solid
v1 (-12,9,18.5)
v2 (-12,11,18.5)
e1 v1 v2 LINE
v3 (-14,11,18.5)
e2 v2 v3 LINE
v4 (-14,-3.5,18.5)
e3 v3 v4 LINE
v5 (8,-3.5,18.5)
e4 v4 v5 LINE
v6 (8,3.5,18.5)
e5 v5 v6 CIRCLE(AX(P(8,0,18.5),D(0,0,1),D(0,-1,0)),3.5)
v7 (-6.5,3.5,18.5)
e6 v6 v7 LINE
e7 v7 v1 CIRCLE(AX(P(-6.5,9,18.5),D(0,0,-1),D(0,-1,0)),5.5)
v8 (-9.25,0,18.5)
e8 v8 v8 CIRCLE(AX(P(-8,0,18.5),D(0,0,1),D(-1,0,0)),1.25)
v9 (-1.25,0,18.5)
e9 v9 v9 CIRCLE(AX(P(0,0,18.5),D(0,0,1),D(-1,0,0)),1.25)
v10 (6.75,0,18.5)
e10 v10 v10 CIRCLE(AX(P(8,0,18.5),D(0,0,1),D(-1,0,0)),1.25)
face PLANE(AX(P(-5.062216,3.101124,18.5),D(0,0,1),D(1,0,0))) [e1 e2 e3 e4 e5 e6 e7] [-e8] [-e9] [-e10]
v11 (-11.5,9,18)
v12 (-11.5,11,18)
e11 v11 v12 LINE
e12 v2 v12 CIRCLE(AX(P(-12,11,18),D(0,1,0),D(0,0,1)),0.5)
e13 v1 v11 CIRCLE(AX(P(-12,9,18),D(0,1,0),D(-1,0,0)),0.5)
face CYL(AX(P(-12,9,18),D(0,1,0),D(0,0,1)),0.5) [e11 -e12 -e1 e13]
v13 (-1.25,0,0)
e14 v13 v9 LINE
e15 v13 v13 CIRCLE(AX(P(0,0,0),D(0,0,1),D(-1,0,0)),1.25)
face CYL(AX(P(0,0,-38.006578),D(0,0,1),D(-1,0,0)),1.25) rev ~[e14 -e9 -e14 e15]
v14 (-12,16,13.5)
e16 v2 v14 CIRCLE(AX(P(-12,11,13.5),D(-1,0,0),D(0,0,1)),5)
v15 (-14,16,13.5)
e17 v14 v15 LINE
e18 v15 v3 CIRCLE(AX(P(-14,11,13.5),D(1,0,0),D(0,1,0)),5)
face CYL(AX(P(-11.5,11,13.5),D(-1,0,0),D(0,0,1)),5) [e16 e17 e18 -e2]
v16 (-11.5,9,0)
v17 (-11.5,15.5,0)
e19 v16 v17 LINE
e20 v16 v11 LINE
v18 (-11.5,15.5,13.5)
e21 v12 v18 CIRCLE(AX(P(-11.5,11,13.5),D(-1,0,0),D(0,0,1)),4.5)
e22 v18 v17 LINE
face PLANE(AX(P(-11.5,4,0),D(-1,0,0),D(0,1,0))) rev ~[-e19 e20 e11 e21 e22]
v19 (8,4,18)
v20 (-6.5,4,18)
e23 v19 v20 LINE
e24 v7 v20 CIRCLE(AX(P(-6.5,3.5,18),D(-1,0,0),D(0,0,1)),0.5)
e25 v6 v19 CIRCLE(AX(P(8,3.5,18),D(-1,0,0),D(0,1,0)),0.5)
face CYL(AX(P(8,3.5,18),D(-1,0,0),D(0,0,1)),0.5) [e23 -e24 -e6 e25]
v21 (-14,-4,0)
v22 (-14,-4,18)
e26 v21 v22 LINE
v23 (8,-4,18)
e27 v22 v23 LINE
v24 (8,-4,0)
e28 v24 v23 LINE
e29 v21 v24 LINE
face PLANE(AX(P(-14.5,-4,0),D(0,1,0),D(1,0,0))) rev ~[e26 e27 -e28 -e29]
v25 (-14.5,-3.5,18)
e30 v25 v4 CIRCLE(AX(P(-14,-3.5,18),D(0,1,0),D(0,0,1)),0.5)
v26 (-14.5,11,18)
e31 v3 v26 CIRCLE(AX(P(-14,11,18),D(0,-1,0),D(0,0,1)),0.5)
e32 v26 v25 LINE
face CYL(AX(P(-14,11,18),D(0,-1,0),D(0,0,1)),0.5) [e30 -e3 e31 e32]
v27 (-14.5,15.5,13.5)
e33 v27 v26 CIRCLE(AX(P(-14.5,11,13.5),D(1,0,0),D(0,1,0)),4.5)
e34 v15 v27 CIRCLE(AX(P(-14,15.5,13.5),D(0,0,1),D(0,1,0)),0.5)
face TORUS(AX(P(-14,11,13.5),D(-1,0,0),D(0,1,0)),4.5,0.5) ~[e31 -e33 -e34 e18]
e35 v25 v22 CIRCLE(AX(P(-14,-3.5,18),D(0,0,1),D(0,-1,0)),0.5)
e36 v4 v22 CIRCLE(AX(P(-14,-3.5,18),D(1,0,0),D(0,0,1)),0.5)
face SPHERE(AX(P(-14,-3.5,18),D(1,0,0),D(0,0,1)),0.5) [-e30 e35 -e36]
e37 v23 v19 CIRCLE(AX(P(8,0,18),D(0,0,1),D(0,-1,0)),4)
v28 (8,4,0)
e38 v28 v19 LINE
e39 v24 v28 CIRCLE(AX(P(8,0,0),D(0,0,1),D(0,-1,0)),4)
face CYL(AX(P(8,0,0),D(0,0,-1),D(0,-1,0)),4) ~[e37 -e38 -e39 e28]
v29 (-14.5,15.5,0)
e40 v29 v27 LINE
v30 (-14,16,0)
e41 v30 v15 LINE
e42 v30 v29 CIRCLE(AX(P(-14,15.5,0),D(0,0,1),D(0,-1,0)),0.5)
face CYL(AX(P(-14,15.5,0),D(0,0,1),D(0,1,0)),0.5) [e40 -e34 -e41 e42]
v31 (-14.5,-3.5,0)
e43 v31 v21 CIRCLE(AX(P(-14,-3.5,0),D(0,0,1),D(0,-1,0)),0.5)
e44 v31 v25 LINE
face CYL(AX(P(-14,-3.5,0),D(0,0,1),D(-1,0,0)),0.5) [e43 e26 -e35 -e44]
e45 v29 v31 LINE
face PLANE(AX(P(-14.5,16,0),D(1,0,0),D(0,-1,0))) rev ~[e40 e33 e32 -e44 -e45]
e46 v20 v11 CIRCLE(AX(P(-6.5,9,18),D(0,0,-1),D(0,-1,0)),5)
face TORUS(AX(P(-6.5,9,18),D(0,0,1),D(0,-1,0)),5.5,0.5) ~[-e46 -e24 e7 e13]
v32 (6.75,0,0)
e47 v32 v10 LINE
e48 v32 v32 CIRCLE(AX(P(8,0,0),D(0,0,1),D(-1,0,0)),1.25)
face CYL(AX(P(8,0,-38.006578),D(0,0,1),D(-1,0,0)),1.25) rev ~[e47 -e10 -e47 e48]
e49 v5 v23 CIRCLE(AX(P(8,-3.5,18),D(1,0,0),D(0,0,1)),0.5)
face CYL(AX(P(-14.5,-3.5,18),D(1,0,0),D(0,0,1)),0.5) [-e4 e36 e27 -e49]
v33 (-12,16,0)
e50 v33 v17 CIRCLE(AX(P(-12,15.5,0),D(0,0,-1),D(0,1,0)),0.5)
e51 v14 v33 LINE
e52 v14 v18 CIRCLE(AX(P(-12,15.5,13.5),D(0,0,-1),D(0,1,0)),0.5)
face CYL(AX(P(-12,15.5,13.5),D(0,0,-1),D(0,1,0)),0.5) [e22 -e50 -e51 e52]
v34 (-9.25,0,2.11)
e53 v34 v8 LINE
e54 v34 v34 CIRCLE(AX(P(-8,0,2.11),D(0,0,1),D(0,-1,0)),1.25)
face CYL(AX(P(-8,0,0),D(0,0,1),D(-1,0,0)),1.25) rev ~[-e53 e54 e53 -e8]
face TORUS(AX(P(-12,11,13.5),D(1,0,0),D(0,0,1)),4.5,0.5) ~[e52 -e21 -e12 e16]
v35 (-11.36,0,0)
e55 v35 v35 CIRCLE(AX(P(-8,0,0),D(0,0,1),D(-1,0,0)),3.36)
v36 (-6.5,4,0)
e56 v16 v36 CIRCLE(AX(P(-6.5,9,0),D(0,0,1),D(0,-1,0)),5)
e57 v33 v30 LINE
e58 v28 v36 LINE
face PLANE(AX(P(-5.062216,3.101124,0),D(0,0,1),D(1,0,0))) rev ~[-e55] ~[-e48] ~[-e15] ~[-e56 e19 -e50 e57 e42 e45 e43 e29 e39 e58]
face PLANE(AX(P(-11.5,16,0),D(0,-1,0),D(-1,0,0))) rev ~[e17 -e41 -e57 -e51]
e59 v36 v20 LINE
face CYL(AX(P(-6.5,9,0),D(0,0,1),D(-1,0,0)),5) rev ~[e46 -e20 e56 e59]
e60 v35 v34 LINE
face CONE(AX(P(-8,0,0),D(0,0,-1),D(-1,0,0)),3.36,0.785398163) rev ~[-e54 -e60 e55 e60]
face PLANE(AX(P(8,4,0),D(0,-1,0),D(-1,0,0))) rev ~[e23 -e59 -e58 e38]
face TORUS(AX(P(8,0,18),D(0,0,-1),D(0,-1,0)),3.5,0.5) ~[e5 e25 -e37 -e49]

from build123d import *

# Parameters (mm, degrees)
F0_R           = 1.5
F1_DEPTH       = 18.5
F2_D           = 2.5
F3_D           = 2.5
F3_CSINK_D     = 6.72
F3_CSINK_ANGLE = 90
F4_R           = 5
F5_R           = 0.5


with BuildPart() as f1:
    # F0 (on Top) → F1 (new body)
    with BuildSketch(Plane.XY):
        with BuildLine():
            Line((-14.5, -4), (8, -4))
            ThreePointArc((8, -4), (12, 0), (8, 4))
            Line((8, 4), (-11.5, 4))
            Line((-11.5, 4), (-11.5, 16))
            Line((-11.5, 16), (-14.5, 16))
            Line((-14.5, 16), (-14.5, -4))
        make_face()
        with Locations((-8, 0)):
            Circle(F0_R, mode=Mode.SUBTRACT)
        Circle(F0_R, mode=Mode.SUBTRACT)
        with Locations((8, 0)):
            Circle(F0_R, mode=Mode.SUBTRACT)
        Circle(F0_R)
        with Locations((8, 0)):
            Circle(F0_R)
        with Locations((-8, 0)):
            Circle(F0_R)
    extrude(amount=F1_DEPTH)

    # F2 (through all)
    with Locations(Plane(origin=(0, 0, 0), x_dir=(1, 0, 0), z_dir=(0, 0, -1))):
        with Locations((8, 0), (0, 0)):
            Hole(F2_D / 2)

    # F3 (through all)
    with Locations(Plane(origin=(0, 0, 0), x_dir=(1, 0, 0), z_dir=(0, 0, -1))):
        with Locations((-8, 0)):
            CounterSinkHole(F3_D / 2, F3_CSINK_D / 2, counter_sink_angle=F3_CSINK_ANGLE)

    # F4
    f4_edges = [f1.edges().sort_by_distance(p)[0] for p in [
        (-11.5, 4, 9.25),
        (-13, 16, 18.5),
    ]]
    fillet(f4_edges, radius=F4_R)

    # F5
    f5_edges = [f1.edges().sort_by_distance(p)[0] for p in [
        (-3.25, -4, 18.5),
        (-14.5, 3.5, 18.5),
        (-14.5, 14.535534, 17.035534),
        (-14.5, -4, 9.25),
    ]]
    fillet(f5_edges, radius=F5_R)


solid = f1.part
